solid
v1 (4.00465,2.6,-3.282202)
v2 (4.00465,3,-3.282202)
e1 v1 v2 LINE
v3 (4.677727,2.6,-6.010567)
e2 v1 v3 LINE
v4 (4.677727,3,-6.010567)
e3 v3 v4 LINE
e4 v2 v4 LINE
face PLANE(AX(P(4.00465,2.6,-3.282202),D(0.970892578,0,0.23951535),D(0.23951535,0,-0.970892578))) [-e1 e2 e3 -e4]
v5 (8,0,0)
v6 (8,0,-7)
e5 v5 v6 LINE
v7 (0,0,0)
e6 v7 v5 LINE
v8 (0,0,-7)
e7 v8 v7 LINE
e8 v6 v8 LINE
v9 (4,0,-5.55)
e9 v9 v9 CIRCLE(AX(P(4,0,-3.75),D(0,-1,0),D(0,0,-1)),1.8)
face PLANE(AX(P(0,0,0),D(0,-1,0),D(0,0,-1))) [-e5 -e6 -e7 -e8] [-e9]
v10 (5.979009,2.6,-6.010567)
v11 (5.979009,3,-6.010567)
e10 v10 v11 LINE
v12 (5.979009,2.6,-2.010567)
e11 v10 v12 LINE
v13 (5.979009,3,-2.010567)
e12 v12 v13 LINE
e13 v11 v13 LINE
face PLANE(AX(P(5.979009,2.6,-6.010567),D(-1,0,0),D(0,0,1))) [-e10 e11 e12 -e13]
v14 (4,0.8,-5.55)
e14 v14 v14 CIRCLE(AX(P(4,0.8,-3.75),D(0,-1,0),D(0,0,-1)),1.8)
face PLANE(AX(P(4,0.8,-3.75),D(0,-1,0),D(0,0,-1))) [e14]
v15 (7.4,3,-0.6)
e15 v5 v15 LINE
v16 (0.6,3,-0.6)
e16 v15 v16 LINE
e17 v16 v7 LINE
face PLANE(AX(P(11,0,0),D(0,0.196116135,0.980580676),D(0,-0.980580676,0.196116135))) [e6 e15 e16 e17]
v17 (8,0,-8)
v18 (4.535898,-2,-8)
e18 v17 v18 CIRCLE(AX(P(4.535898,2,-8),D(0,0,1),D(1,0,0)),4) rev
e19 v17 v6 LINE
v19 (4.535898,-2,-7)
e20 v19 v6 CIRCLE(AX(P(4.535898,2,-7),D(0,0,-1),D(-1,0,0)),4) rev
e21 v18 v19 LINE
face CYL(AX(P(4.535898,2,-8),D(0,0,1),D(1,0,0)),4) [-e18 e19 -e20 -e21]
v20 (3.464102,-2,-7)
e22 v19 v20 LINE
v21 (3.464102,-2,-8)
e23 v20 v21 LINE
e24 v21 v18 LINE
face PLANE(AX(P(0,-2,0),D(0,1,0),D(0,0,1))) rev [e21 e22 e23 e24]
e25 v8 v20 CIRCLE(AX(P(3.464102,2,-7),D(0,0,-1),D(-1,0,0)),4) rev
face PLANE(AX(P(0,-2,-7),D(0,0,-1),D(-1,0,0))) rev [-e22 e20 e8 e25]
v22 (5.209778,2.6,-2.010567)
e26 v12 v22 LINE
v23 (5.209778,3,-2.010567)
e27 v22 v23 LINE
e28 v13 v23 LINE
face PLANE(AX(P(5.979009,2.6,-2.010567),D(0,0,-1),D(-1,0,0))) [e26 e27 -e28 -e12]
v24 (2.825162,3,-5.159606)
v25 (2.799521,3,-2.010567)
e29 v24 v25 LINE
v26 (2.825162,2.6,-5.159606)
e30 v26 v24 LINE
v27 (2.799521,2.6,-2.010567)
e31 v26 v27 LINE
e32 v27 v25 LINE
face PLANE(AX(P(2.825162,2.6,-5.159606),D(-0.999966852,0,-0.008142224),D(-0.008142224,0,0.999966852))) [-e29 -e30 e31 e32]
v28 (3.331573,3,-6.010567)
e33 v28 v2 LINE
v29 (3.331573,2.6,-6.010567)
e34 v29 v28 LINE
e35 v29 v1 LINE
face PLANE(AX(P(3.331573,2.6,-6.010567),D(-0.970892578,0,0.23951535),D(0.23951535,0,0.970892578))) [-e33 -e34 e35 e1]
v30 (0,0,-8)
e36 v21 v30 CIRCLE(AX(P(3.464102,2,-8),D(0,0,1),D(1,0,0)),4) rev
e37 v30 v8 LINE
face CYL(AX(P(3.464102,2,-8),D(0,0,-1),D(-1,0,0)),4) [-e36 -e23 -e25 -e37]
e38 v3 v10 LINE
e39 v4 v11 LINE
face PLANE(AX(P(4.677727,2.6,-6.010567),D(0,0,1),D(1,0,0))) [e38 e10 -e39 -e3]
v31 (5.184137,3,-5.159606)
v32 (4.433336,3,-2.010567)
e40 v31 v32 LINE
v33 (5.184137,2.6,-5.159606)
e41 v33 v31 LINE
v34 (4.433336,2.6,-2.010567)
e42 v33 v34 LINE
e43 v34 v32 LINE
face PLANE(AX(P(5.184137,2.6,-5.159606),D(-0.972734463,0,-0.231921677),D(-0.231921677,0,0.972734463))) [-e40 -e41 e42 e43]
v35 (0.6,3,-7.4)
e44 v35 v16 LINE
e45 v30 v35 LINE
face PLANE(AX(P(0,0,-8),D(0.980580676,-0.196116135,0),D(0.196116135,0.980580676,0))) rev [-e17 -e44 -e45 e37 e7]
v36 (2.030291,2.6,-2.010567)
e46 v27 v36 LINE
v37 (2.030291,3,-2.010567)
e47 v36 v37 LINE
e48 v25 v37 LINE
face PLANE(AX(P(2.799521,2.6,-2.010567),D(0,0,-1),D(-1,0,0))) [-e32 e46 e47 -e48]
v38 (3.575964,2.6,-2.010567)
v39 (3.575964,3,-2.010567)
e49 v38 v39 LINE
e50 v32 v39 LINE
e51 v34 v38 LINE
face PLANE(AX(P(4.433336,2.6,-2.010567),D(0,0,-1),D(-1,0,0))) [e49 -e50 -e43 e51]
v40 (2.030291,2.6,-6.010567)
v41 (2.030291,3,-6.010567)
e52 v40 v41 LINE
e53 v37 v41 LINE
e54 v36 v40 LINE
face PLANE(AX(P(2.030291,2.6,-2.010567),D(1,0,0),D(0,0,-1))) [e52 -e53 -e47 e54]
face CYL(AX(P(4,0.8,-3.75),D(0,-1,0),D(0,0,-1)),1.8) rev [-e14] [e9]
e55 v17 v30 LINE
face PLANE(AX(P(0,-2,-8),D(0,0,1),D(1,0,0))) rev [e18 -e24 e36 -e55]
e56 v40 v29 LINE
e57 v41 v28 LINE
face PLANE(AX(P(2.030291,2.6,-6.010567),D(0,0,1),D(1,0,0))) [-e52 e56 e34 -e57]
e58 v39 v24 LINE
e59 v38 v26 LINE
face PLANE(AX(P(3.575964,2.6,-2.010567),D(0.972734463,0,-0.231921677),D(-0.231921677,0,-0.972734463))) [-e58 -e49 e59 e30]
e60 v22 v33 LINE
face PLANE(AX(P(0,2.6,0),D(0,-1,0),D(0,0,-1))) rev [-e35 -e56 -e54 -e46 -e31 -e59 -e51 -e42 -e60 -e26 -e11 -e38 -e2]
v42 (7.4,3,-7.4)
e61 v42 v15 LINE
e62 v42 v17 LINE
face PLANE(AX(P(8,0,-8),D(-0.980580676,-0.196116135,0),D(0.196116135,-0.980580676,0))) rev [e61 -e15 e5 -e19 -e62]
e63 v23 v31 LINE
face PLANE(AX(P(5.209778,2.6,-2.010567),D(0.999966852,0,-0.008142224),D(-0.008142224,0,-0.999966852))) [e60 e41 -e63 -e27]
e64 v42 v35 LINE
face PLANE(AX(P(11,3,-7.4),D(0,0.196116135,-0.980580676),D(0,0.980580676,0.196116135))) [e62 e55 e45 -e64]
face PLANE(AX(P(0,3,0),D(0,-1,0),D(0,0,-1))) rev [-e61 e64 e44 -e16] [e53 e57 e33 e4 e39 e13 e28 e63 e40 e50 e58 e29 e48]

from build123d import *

# Parameters (mm, degrees)
SKETCH1_W               = 8
SKETCH1_H               = 8
BOSS_EXTRUDE1_DEPTH     = 3
CUT_EXTRUDE1_DEPTH      = 12.704699911
CUT_EXTRUDE1_DEPTH_BACK = 12.704699911
CUT_EXTRUDE2_DEPTH      = 11
SKETCH4_R               = 1.8
CUT_EXTRUDE3_DEPTH      = 0.8
SKETCH5_W               = 8
SKETCH5_H               = 1
BOSS_EXTRUDE2_DEPTH     = 2
FILLET1_R               = 4
CUT_EXTRUDE4_DEPTH      = 0.4


with BuildPart() as part:
    # Sketch1 → Boss-Extrude1 (new body)
    with BuildSketch(Plane(origin=(0, 0, 0), x_dir=(1, 0, 0), z_dir=(0, 1, 0))):
        with Locations((4, 4)):
            Rectangle(SKETCH1_W, SKETCH1_H)
    extrude(amount=BOSS_EXTRUDE1_DEPTH)

    # Sketch2 → Cut-Extrude1 (cut, two sides: drawn at the far end of the back side and taken through both)
    with BuildSketch(Plane.XY.offset(-CUT_EXTRUDE1_DEPTH_BACK)):
        Polygon((0, 0), (0.6, 3), (0, 3), align=None)
        Polygon((8, 0), (7.4, 3), (8, 3), align=None)
    extrude(amount=CUT_EXTRUDE1_DEPTH + CUT_EXTRUDE1_DEPTH_BACK, mode=Mode.SUBTRACT)

    # Sketch3 → Cut-Extrude2 (cut)
    with BuildSketch(Plane(origin=(0, 0, 0), x_dir=(0, 0, -1), z_dir=(1, 0, 0))):
        Polygon((0, 0), (0.6, 3), (0, 3), align=None)
        Polygon((8, 3), (7.4, 3), (8, 0), align=None)
    extrude(amount=CUT_EXTRUDE2_DEPTH, mode=Mode.SUBTRACT)

    # Sketch4 → Cut-Extrude3 (cut)
    with BuildSketch(Plane.XZ):
        with Locations(Location((4, -3.75, 0), (0, 0, 270))):
            Circle(SKETCH4_R)
    extrude(amount=-CUT_EXTRUDE3_DEPTH, mode=Mode.SUBTRACT)

    # Sketch5 → Boss-Extrude2 (add)
    with BuildSketch(Plane.XZ):
        with Locations((4, -7.5)):
            Rectangle(SKETCH5_W, SKETCH5_H)
    extrude(amount=BOSS_EXTRUDE2_DEPTH)

    # Fillet1
    # the kernel refuses this fillet: 4 mm, written as the material it takes off along each edge
    with BuildSketch(Plane(origin=(8, -2, -16.660254038), x_dir=(0, 1, 0), z_dir=(0, 0, 1)), Plane(origin=(0, -2, 1.660254038), x_dir=(0, 1, 0), z_dir=(0, 0, -1))) as fillet1_piece_1:
        with BuildLine():
            CenterArc((4, 3.464101615), FILLET1_R, 180, 60)
            Line((0, 3.464101615), (-0.08, 3.464101615))
            Line((-0.08, 3.464101615), (-0.08, 0))
            Line((-0.08, 0), (0, -0.08))
            ThreePointArc((0, -0.08), (1, -0.08), (1.96, -0.069282032))
            Line((1.96, -0.069282032), (2, 0))
        make_face()
    extrude(amount=18.320508076, mode=Mode.SUBTRACT)

    # Sketch6 → Cut-Extrude4 (cut)
    with BuildSketch(Plane(origin=(0, 3, 0), x_dir=(1, 0, 0), z_dir=(0, 1, 0))):
        Polygon((2.030290665, 2.010567225), (2.030290665, 6.010567225), (3.331572716, 6.010567225), (4.004649639, 3.28220184), (4.677726562, 6.010567225), (5.979008613, 6.010567225), (5.979008613, 2.010567225), (5.209777844, 2.010567225), (5.184136818, 5.159605686), (4.433335536, 2.010567225), (3.575963742, 2.010567225), (2.82516246, 5.159605686), (2.799521434, 2.010567225), align=None)
    extrude(amount=-CUT_EXTRUDE4_DEPTH, mode=Mode.SUBTRACT)


solid = part.part
